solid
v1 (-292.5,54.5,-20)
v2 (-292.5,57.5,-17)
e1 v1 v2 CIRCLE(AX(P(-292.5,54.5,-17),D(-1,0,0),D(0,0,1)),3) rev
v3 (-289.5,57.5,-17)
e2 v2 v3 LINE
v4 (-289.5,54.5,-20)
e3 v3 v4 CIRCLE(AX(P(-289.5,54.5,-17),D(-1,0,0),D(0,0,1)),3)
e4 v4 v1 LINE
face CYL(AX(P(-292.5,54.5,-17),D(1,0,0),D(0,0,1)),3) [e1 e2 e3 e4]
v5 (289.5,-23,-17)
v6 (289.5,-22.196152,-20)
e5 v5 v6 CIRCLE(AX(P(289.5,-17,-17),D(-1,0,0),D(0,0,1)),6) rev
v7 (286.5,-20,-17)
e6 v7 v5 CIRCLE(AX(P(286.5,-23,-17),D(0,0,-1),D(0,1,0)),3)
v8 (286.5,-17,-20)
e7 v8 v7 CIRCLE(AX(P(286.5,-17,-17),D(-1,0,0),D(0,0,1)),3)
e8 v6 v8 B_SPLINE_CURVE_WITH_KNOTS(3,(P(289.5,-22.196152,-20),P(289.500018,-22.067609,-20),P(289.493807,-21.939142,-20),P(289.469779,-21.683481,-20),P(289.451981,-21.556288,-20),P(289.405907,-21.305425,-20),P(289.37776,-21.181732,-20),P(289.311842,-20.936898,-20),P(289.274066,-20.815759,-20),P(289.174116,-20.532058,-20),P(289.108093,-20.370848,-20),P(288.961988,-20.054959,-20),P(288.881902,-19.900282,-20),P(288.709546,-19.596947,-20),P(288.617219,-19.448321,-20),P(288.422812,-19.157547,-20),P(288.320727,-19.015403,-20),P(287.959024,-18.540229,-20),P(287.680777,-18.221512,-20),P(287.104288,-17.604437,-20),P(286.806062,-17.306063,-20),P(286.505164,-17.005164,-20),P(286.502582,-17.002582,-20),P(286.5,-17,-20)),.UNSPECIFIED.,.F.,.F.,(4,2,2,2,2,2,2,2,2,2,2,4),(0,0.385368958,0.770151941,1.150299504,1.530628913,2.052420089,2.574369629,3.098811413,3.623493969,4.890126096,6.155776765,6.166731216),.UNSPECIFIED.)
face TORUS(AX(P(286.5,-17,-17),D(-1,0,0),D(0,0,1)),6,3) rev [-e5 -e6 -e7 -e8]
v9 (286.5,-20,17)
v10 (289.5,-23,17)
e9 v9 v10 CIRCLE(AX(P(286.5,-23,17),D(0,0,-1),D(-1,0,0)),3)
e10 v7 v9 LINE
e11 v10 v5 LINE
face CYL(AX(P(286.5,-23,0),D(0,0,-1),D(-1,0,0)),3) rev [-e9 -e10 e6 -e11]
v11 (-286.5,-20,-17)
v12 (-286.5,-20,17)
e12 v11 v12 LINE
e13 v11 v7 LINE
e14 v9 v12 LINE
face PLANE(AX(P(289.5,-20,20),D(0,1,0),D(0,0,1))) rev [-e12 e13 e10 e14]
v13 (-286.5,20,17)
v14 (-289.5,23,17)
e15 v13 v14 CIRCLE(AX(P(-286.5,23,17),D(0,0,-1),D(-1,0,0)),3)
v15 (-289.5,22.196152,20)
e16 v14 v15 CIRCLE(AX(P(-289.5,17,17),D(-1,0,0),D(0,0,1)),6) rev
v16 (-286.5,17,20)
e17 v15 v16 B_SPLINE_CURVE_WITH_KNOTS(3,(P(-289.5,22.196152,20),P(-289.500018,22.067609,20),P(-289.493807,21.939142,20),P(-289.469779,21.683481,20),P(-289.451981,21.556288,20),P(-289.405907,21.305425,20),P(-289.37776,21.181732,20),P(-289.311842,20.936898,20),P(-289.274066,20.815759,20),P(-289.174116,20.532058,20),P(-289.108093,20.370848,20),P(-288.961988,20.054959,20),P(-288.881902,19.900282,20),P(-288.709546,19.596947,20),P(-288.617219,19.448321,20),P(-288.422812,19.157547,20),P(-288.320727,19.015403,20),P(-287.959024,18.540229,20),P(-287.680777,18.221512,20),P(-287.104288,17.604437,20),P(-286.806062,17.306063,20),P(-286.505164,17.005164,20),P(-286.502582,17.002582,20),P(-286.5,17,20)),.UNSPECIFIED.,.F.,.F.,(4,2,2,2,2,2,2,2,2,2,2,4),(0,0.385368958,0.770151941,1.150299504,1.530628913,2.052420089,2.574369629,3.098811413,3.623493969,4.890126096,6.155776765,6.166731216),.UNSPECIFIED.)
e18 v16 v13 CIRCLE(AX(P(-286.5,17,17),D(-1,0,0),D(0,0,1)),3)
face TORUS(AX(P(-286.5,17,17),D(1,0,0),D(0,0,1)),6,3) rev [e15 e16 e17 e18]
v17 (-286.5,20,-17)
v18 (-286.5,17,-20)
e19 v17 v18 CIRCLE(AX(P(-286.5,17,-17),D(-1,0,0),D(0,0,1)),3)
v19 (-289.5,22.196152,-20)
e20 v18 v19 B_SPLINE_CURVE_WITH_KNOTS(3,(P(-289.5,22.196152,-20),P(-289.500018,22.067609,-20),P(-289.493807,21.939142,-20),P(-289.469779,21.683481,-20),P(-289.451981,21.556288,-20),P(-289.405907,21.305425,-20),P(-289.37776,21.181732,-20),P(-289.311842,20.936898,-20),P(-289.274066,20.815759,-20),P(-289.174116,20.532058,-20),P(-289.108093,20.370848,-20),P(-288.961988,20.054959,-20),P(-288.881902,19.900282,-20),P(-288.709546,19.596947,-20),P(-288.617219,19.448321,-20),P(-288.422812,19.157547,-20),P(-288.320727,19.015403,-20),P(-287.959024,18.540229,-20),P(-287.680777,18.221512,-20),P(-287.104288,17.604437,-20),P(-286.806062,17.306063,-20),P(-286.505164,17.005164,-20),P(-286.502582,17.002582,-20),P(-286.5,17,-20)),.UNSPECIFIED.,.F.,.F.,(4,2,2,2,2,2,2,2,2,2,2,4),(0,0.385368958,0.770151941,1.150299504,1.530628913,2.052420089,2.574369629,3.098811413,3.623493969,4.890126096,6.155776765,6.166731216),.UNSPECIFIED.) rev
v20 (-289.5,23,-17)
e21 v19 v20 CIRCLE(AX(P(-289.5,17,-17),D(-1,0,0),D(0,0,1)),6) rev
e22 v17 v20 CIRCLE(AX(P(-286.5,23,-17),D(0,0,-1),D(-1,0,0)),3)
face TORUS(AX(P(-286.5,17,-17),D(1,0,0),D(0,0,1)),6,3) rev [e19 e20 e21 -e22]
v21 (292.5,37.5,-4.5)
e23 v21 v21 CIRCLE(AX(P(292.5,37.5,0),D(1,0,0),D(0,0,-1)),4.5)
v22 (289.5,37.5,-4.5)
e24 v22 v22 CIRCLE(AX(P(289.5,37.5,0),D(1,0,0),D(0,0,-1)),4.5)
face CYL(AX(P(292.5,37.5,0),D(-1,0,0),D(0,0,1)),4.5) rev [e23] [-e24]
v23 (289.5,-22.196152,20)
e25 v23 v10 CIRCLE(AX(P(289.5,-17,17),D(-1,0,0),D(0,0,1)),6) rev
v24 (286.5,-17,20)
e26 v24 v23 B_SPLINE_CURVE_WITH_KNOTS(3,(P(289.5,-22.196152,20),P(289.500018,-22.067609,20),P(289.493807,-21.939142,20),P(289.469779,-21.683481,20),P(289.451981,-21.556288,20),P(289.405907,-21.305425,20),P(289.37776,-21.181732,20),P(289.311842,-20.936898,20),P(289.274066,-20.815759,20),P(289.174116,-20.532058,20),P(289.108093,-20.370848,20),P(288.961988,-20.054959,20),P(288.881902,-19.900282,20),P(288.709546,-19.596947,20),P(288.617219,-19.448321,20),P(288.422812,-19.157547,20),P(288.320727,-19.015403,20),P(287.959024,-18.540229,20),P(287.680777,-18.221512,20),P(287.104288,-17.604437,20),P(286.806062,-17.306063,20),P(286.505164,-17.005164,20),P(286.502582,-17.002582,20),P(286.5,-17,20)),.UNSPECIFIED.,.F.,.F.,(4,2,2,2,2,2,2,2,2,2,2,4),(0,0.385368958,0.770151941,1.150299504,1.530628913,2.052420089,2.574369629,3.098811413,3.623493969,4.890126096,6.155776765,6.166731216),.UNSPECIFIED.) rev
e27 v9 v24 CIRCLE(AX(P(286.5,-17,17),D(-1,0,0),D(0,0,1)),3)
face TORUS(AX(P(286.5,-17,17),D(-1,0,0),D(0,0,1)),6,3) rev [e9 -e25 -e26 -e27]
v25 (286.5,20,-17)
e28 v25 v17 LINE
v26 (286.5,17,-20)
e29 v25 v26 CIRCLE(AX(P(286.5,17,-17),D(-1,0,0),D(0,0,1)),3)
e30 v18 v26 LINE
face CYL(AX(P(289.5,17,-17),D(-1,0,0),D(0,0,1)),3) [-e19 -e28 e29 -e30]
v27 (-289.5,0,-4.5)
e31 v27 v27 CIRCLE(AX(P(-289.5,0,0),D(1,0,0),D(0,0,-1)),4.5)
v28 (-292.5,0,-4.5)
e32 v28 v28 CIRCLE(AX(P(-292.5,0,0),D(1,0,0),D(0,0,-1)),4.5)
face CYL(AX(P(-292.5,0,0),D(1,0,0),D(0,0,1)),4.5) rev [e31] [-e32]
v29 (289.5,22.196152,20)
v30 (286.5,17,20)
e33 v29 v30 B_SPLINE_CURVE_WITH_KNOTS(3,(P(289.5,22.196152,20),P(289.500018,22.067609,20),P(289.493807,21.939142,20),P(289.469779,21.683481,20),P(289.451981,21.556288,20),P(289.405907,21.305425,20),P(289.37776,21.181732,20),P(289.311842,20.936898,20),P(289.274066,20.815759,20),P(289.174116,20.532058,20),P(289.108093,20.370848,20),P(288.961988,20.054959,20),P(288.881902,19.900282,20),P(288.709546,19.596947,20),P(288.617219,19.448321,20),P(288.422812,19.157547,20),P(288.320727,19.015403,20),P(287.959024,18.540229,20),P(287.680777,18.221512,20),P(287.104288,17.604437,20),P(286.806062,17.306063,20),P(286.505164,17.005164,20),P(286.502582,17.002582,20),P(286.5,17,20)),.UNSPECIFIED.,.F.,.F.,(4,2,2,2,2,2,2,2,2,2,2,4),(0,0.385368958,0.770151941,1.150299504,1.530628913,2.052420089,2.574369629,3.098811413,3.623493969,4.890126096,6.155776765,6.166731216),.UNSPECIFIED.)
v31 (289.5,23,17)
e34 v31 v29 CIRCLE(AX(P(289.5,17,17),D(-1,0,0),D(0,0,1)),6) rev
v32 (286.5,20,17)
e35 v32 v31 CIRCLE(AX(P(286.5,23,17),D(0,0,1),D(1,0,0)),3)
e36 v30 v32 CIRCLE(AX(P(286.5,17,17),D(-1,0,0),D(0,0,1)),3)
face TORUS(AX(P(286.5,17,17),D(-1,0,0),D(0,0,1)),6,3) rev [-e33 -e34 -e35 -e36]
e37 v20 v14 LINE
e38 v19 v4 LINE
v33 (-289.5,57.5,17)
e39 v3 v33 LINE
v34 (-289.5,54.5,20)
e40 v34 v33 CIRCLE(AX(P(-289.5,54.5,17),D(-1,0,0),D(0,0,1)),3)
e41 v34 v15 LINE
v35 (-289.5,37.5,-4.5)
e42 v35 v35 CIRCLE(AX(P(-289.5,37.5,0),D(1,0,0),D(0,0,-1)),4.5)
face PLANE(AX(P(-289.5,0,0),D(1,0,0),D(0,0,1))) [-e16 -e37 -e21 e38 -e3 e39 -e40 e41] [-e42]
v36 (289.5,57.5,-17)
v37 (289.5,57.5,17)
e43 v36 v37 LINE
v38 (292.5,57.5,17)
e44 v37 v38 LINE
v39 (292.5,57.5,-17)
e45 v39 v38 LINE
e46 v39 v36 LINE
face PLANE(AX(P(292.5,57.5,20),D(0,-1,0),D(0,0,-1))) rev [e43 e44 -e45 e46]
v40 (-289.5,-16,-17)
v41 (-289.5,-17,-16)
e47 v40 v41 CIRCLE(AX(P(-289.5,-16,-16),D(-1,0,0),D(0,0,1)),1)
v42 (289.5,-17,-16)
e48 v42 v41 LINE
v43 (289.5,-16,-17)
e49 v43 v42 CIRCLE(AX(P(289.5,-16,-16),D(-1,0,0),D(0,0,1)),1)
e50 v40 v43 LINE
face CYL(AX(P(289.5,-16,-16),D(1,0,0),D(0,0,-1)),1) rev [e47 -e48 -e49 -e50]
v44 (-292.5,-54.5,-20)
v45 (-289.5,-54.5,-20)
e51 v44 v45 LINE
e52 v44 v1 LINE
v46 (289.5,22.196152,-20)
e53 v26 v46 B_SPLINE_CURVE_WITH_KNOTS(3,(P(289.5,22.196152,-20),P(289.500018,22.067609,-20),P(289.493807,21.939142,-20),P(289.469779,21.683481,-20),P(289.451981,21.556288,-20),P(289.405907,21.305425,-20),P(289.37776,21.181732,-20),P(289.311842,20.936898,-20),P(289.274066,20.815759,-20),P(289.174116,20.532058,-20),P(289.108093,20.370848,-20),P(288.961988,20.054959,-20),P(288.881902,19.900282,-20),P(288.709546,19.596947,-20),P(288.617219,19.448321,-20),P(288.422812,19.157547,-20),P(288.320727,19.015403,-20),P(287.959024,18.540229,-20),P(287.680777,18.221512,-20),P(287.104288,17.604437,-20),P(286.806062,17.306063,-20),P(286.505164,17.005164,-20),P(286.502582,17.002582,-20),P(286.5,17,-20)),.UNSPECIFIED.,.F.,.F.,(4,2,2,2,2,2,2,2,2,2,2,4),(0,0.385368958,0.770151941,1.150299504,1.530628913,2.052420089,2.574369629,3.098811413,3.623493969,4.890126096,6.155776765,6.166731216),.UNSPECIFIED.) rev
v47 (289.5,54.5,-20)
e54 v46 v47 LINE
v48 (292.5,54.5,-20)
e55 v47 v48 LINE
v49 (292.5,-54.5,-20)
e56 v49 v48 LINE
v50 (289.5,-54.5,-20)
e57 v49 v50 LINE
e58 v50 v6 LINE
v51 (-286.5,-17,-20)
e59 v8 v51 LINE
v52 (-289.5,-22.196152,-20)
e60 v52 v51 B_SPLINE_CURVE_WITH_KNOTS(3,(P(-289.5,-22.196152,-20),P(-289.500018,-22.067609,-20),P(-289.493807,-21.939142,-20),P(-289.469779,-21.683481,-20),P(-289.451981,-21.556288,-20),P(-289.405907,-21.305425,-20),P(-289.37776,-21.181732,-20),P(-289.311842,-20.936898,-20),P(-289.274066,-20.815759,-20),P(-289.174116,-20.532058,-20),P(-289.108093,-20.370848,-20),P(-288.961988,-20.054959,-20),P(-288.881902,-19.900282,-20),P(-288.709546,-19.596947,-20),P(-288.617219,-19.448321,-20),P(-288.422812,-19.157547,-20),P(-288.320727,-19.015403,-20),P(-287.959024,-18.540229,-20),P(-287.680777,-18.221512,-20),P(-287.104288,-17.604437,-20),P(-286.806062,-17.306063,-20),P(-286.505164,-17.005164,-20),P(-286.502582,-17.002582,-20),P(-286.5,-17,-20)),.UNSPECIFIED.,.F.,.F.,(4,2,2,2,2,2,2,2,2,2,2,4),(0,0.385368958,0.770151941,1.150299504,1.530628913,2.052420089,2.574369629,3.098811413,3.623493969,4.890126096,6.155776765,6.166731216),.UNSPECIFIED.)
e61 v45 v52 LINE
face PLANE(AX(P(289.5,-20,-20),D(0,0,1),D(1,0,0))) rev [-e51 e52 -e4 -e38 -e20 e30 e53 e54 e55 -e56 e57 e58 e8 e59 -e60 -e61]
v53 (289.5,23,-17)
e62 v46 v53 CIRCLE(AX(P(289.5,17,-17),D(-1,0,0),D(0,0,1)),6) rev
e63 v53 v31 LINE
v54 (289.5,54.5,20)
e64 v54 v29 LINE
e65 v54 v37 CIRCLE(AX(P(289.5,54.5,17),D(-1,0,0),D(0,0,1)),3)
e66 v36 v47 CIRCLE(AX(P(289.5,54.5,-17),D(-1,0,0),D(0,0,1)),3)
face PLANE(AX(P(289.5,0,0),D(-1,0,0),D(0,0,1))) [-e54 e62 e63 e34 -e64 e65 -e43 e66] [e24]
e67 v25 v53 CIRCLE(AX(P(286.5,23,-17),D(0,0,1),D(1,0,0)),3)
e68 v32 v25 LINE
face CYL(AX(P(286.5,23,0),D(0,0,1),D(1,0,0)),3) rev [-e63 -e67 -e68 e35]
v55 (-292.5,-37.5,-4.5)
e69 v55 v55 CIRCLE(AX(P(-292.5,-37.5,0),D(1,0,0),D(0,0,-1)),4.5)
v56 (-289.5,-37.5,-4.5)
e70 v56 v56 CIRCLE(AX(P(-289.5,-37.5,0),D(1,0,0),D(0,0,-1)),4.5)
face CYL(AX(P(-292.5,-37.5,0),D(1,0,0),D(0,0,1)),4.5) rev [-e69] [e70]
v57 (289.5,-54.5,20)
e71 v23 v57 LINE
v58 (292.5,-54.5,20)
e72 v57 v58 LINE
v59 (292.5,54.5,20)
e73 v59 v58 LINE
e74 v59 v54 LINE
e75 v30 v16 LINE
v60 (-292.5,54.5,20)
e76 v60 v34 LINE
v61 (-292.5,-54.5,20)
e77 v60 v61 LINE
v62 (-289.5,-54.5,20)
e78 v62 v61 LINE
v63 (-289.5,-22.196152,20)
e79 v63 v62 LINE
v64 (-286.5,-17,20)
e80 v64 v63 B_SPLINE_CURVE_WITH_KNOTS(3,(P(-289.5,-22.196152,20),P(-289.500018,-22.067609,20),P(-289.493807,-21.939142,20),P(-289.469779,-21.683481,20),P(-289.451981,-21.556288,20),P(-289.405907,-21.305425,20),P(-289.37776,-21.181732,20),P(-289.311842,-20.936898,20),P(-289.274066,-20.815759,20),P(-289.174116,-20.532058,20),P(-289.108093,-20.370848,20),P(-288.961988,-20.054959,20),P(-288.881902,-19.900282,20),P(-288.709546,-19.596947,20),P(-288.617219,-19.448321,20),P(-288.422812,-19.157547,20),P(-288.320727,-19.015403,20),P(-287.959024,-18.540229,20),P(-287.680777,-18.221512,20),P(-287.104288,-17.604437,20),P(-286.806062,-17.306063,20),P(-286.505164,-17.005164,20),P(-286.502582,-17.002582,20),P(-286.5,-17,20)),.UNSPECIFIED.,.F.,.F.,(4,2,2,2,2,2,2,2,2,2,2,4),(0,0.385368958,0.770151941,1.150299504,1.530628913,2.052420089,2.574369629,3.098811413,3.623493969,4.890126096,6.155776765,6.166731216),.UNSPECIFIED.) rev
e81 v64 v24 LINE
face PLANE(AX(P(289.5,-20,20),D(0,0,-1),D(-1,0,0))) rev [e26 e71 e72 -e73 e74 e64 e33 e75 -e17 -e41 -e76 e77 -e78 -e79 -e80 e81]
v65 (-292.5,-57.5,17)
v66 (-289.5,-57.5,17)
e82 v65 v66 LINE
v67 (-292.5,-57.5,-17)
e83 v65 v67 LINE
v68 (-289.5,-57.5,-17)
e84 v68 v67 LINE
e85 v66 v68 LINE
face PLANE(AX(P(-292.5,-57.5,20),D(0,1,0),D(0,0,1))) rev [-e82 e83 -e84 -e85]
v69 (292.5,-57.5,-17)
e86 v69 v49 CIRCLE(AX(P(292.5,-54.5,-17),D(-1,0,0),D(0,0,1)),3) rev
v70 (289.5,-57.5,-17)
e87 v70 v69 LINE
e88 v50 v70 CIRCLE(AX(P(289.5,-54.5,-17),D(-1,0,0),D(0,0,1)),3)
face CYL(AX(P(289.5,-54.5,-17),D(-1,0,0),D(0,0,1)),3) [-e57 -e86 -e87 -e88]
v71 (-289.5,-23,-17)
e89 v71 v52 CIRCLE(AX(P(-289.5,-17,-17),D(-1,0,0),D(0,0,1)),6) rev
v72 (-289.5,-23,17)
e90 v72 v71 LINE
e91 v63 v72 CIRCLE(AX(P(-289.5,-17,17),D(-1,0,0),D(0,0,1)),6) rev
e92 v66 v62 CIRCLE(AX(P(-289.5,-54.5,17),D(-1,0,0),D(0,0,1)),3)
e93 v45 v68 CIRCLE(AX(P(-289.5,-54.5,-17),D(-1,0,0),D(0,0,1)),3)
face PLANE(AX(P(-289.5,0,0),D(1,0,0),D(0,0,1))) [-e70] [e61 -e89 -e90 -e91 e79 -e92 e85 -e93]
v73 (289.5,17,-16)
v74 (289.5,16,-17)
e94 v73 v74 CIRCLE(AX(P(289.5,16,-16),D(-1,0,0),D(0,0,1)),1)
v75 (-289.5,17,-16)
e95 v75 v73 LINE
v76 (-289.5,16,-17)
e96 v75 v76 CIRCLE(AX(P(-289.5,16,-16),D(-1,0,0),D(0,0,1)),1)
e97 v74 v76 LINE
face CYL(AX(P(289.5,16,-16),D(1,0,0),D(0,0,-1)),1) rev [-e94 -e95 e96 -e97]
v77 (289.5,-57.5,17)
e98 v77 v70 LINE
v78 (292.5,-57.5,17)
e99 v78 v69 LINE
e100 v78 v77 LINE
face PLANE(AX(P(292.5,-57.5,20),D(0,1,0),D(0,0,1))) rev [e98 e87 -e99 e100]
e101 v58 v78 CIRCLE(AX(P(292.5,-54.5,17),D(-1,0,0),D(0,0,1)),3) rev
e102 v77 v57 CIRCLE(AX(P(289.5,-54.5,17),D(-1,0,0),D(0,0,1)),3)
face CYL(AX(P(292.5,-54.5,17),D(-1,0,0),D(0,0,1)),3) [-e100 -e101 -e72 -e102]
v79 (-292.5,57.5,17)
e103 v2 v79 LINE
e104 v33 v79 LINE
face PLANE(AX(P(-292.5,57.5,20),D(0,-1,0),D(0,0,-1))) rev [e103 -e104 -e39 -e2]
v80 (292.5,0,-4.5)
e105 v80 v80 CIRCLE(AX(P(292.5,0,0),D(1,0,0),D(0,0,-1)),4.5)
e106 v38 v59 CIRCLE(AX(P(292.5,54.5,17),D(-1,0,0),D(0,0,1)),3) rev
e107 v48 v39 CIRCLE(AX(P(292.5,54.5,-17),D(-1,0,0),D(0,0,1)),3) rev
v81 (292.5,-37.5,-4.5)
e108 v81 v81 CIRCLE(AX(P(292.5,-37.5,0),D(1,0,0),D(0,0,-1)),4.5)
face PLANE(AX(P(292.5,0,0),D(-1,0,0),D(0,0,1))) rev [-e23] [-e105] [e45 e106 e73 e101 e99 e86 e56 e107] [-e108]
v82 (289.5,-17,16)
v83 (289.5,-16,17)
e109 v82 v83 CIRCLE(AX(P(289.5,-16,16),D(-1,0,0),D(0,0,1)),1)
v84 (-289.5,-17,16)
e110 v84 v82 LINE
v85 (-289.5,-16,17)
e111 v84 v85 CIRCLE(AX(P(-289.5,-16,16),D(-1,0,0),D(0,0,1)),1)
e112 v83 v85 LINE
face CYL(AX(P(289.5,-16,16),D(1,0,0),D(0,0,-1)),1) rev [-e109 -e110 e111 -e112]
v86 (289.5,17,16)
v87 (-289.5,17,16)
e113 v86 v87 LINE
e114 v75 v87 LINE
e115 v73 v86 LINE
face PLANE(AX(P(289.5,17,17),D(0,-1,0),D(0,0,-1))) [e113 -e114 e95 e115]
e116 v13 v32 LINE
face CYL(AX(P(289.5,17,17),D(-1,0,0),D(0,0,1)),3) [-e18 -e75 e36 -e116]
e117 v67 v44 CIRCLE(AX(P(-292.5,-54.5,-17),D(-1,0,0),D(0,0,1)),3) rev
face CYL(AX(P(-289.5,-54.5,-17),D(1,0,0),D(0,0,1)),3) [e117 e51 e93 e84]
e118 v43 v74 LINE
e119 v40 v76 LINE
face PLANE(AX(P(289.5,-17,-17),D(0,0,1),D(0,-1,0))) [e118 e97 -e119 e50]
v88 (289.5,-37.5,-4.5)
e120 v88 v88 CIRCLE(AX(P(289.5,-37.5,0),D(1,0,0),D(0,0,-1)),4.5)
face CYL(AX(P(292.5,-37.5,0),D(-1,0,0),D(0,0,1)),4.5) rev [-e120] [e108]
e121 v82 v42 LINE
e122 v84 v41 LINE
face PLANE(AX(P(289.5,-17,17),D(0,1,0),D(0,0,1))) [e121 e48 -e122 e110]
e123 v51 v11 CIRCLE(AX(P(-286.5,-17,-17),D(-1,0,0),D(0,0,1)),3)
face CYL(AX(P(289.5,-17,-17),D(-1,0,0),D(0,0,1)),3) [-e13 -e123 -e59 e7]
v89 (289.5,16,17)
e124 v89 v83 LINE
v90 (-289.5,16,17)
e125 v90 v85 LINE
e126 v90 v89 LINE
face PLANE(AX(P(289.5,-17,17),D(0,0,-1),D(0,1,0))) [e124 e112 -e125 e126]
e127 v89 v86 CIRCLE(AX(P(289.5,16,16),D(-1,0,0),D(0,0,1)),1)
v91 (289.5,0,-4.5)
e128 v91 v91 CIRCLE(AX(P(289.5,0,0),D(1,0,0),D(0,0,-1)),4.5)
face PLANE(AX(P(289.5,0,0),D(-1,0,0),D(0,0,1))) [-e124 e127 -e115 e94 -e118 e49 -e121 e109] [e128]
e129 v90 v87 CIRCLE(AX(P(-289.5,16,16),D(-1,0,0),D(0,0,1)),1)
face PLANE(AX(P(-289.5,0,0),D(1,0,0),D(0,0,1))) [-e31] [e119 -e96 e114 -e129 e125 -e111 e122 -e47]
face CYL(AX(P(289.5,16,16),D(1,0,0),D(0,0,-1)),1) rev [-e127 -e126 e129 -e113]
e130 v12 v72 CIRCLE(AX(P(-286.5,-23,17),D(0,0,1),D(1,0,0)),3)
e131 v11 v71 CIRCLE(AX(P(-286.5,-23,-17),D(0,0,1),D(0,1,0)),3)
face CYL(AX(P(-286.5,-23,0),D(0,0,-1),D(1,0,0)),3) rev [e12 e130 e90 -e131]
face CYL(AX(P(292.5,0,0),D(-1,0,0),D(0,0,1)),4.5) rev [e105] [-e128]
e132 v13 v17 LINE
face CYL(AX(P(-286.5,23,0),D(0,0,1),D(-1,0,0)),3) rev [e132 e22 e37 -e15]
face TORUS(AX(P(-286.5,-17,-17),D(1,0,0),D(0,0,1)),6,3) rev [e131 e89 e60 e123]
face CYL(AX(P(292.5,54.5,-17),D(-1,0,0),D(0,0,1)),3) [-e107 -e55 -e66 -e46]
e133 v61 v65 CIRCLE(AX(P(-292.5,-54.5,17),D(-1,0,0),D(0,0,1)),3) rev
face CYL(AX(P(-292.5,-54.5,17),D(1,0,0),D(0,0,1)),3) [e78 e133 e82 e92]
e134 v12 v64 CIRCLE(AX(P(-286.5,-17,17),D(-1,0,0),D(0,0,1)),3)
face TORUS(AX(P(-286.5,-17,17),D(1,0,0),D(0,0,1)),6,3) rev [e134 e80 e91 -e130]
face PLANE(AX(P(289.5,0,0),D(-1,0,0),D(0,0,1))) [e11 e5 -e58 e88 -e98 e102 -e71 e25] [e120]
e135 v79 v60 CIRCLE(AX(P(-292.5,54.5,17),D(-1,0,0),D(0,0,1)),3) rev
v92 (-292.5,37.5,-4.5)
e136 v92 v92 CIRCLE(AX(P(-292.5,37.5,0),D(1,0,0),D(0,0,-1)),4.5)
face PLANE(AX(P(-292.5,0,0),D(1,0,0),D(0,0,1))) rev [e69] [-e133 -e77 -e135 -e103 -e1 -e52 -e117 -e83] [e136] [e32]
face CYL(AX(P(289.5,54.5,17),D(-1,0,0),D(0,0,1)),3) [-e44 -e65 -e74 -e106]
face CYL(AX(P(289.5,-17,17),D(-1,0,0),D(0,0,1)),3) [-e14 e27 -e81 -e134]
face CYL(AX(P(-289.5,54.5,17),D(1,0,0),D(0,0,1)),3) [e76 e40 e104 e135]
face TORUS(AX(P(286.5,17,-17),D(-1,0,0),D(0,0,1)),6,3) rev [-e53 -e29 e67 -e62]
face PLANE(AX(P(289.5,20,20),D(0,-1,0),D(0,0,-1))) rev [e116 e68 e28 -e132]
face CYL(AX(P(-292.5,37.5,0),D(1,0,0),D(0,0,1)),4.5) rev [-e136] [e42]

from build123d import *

# Parameters (mm, degrees)
SKETCH1_W           = 40
SKETCH1_H           = 40
SKETCH1_W_2         = 34
SKETCH1_H_2         = 34
BOSS_EXTRUDE1_DEPTH = 289.5
FILLET1_R           = 1
FILLET2_R           = 3
SKETCH2_W           = 40
SKETCH2_H           = 115
SKETCH2_R           = 4.5
BOSS_EXTRUDE2_DEPTH = 3
FILLET3_R           = 3
FILLET4_R           = 3


with BuildPart() as part:
    # Sketch1 → Boss-Extrude1 (new body)
    with BuildSketch(Plane(origin=(0, 0, 0), x_dir=(0, 0, -1), z_dir=(1, 0, 0))):
        Rectangle(SKETCH1_W, SKETCH1_H)
        Rectangle(SKETCH1_W_2, SKETCH1_H_2, mode=Mode.SUBTRACT)
    extrude(amount=BOSS_EXTRUDE1_DEPTH)

    # Fillet1
    fillet1_edges = [part.edges().sort_by_distance(p)[0] for p in [
        (144.75, -17, -17),
        (144.75, 17, -17),
        (144.75, 17, 17),
        (144.75, -17, 17),
    ]]
    fillet(fillet1_edges, radius=FILLET1_R)

    # Fillet2
    fillet2_edges = [part.edges().sort_by_distance(p)[0] for p in [
        (144.75, -20, -20),
        (144.75, -20, 20),
        (144.75, 20, 20),
        (144.75, 20, -20),
    ]]
    fillet(fillet2_edges, radius=FILLET2_R)

    # Sketch2 → Boss-Extrude2 (add)
    with BuildSketch(Plane(origin=(289.5, 0, 0), x_dir=(0, 0, -1), z_dir=(1, 0, 0))):
        Rectangle(SKETCH2_W, SKETCH2_H)
        Circle(SKETCH2_R, mode=Mode.SUBTRACT)
        with Locations((0, -37.5)):
            Circle(SKETCH2_R, mode=Mode.SUBTRACT)
        with Locations((0, 37.5)):
            Circle(SKETCH2_R, mode=Mode.SUBTRACT)
    extrude(amount=BOSS_EXTRUDE2_DEPTH)

    # Fillet3
    # the kernel refuses this fillet: 3 mm, written as the material it adds along each edge
    with BuildSketch(Plane(origin=(289.5, -20, 17), x_dir=(0, -1, 0), z_dir=(0, 0, -1)), Plane(origin=(289.5, 20, -17), x_dir=(0, 1, 0), z_dir=(0, 0, 1))) as fillet3_piece_1:
        with BuildLine():
            CenterArc((FILLET3_R, FILLET3_R), FILLET3_R, 180, 90)
            Line((0, FILLET3_R), (0, 0))
            Line((0, 0), (FILLET3_R, 0))
        make_face()
    extrude(amount=34)
    with BuildSketch(Plane(origin=(289.5, 17, 17), x_dir=(0, 1, 0), z_dir=(0, 0, -1))) as fillet3_piece_2_section:
        with BuildLine():
            CenterArc((3 + FILLET3_R, -FILLET3_R), FILLET3_R, 90, 90)
            Line((3, -FILLET3_R), (3, 0))
            Line((3, 0), (3 + FILLET3_R, 0))
        make_face()
    fillet3_piece_2 = revolve(axis=Axis((289.5, 17, 17), (1, 0, 0)), revolution_arc=233.296989237, mode=Mode.PRIVATE)
    fillet3_piece_2 = split(fillet3_piece_2, bisect_by=Plane(origin=(288.998099396, 20.659325751, 20), z_dir=(0, 0, -1)), keep=Keep.TOP, mode=Mode.PRIVATE)
    fillet3_piece_2 = split(fillet3_piece_2, bisect_by=Plane(origin=(288.998099396, 20.659325751, 17), z_dir=(0, 0, 1)), keep=Keep.TOP, mode=Mode.PRIVATE)
    add(fillet3_piece_2)
    with BuildSketch(Plane(origin=(289.5, 17, -17), x_dir=(0, -0.5976672776328276, 0.8017442392976482), z_dir=(0, 0.8017442392976482, 0.5976672776328276))) as fillet3_piece_3_section:
        with BuildLine():
            CenterArc((3 + FILLET3_R, -FILLET3_R), FILLET3_R, 90, 90)
            Line((3, -FILLET3_R), (3, 0))
            Line((3, 0), (3 + FILLET3_R, 0))
        make_face()
    fillet3_piece_3 = revolve(axis=Axis((289.5, 17, -17), (1, 0, 0)), revolution_arc=233.296989237, mode=Mode.PRIVATE)
    fillet3_piece_3 = split(fillet3_piece_3, bisect_by=Plane(origin=(288.565115083, 19.249816872, -20), z_dir=(0, 0, 1)), keep=Keep.TOP, mode=Mode.PRIVATE)
    fillet3_piece_3 = split(fillet3_piece_3, bisect_by=Plane(origin=(288.565115083, 19.249816872, -17), z_dir=(0, 0, -1)), keep=Keep.TOP, mode=Mode.PRIVATE)
    add(fillet3_piece_3)
    with BuildSketch(Plane(origin=(289.5, -17, -17), x_dir=(0, -1, 0), z_dir=(0, 0, 1))) as fillet3_piece_4_section:
        with BuildLine():
            CenterArc((3 + FILLET3_R, -FILLET3_R), FILLET3_R, 90, 90)
            Line((3, -FILLET3_R), (3, 0))
            Line((3, 0), (3 + FILLET3_R, 0))
        make_face()
    fillet3_piece_4 = revolve(axis=Axis((289.5, -17, -17), (1, 0, 0)), revolution_arc=233.296989237, mode=Mode.PRIVATE)
    fillet3_piece_4 = split(fillet3_piece_4, bisect_by=Plane(origin=(288.998099396, -20.659325751, -20), z_dir=(0, 0, 1)), keep=Keep.TOP, mode=Mode.PRIVATE)
    fillet3_piece_4 = split(fillet3_piece_4, bisect_by=Plane(origin=(288.998099396, -20.659325751, -17), z_dir=(0, 0, -1)), keep=Keep.TOP, mode=Mode.PRIVATE)
    add(fillet3_piece_4)
    with BuildSketch(Plane(origin=(289.5, -17, 17), x_dir=(0, -1, 0), z_dir=(0, 0, -1))) as fillet3_piece_5_section:
        with BuildLine():
            CenterArc((3 + FILLET3_R, FILLET3_R), FILLET3_R, 180, 90)
            Line((3, FILLET3_R), (3, 0))
            Line((3, 0), (3 + FILLET3_R, 0))
        make_face()
    fillet3_piece_5 = revolve(axis=Axis((289.5, -17, 17), (-1, 0, 0)), revolution_arc=233.296989237, mode=Mode.PRIVATE)
    fillet3_piece_5 = split(fillet3_piece_5, bisect_by=Plane(origin=(288.998099366, -20.659325736, 20), z_dir=(0, 0, -1)), keep=Keep.TOP, mode=Mode.PRIVATE)
    fillet3_piece_5 = split(fillet3_piece_5, bisect_by=Plane(origin=(288.998099366, -20.659325736, 17), z_dir=(0, 0, 1)), keep=Keep.TOP, mode=Mode.PRIVATE)
    add(fillet3_piece_5)

    # Fillet4
    fillet4_edges = [part.edges().sort_by_distance(p)[0] for p in [
        (291, -57.5, -20),
        (291, 57.5, -20),
        (291, 57.5, 20),
        (291, -57.5, 20),
    ]]
    fillet(fillet4_edges, radius=FILLET4_R)

    # Mirror1: part across plane


with BuildPart() as part_1:
    add(part.part)
    add(part.part.mirror(Plane(origin=(0, 0, 0), x_dir=(0, 0, 1), z_dir=(1, 0, 0))))


solid = part_1.part
